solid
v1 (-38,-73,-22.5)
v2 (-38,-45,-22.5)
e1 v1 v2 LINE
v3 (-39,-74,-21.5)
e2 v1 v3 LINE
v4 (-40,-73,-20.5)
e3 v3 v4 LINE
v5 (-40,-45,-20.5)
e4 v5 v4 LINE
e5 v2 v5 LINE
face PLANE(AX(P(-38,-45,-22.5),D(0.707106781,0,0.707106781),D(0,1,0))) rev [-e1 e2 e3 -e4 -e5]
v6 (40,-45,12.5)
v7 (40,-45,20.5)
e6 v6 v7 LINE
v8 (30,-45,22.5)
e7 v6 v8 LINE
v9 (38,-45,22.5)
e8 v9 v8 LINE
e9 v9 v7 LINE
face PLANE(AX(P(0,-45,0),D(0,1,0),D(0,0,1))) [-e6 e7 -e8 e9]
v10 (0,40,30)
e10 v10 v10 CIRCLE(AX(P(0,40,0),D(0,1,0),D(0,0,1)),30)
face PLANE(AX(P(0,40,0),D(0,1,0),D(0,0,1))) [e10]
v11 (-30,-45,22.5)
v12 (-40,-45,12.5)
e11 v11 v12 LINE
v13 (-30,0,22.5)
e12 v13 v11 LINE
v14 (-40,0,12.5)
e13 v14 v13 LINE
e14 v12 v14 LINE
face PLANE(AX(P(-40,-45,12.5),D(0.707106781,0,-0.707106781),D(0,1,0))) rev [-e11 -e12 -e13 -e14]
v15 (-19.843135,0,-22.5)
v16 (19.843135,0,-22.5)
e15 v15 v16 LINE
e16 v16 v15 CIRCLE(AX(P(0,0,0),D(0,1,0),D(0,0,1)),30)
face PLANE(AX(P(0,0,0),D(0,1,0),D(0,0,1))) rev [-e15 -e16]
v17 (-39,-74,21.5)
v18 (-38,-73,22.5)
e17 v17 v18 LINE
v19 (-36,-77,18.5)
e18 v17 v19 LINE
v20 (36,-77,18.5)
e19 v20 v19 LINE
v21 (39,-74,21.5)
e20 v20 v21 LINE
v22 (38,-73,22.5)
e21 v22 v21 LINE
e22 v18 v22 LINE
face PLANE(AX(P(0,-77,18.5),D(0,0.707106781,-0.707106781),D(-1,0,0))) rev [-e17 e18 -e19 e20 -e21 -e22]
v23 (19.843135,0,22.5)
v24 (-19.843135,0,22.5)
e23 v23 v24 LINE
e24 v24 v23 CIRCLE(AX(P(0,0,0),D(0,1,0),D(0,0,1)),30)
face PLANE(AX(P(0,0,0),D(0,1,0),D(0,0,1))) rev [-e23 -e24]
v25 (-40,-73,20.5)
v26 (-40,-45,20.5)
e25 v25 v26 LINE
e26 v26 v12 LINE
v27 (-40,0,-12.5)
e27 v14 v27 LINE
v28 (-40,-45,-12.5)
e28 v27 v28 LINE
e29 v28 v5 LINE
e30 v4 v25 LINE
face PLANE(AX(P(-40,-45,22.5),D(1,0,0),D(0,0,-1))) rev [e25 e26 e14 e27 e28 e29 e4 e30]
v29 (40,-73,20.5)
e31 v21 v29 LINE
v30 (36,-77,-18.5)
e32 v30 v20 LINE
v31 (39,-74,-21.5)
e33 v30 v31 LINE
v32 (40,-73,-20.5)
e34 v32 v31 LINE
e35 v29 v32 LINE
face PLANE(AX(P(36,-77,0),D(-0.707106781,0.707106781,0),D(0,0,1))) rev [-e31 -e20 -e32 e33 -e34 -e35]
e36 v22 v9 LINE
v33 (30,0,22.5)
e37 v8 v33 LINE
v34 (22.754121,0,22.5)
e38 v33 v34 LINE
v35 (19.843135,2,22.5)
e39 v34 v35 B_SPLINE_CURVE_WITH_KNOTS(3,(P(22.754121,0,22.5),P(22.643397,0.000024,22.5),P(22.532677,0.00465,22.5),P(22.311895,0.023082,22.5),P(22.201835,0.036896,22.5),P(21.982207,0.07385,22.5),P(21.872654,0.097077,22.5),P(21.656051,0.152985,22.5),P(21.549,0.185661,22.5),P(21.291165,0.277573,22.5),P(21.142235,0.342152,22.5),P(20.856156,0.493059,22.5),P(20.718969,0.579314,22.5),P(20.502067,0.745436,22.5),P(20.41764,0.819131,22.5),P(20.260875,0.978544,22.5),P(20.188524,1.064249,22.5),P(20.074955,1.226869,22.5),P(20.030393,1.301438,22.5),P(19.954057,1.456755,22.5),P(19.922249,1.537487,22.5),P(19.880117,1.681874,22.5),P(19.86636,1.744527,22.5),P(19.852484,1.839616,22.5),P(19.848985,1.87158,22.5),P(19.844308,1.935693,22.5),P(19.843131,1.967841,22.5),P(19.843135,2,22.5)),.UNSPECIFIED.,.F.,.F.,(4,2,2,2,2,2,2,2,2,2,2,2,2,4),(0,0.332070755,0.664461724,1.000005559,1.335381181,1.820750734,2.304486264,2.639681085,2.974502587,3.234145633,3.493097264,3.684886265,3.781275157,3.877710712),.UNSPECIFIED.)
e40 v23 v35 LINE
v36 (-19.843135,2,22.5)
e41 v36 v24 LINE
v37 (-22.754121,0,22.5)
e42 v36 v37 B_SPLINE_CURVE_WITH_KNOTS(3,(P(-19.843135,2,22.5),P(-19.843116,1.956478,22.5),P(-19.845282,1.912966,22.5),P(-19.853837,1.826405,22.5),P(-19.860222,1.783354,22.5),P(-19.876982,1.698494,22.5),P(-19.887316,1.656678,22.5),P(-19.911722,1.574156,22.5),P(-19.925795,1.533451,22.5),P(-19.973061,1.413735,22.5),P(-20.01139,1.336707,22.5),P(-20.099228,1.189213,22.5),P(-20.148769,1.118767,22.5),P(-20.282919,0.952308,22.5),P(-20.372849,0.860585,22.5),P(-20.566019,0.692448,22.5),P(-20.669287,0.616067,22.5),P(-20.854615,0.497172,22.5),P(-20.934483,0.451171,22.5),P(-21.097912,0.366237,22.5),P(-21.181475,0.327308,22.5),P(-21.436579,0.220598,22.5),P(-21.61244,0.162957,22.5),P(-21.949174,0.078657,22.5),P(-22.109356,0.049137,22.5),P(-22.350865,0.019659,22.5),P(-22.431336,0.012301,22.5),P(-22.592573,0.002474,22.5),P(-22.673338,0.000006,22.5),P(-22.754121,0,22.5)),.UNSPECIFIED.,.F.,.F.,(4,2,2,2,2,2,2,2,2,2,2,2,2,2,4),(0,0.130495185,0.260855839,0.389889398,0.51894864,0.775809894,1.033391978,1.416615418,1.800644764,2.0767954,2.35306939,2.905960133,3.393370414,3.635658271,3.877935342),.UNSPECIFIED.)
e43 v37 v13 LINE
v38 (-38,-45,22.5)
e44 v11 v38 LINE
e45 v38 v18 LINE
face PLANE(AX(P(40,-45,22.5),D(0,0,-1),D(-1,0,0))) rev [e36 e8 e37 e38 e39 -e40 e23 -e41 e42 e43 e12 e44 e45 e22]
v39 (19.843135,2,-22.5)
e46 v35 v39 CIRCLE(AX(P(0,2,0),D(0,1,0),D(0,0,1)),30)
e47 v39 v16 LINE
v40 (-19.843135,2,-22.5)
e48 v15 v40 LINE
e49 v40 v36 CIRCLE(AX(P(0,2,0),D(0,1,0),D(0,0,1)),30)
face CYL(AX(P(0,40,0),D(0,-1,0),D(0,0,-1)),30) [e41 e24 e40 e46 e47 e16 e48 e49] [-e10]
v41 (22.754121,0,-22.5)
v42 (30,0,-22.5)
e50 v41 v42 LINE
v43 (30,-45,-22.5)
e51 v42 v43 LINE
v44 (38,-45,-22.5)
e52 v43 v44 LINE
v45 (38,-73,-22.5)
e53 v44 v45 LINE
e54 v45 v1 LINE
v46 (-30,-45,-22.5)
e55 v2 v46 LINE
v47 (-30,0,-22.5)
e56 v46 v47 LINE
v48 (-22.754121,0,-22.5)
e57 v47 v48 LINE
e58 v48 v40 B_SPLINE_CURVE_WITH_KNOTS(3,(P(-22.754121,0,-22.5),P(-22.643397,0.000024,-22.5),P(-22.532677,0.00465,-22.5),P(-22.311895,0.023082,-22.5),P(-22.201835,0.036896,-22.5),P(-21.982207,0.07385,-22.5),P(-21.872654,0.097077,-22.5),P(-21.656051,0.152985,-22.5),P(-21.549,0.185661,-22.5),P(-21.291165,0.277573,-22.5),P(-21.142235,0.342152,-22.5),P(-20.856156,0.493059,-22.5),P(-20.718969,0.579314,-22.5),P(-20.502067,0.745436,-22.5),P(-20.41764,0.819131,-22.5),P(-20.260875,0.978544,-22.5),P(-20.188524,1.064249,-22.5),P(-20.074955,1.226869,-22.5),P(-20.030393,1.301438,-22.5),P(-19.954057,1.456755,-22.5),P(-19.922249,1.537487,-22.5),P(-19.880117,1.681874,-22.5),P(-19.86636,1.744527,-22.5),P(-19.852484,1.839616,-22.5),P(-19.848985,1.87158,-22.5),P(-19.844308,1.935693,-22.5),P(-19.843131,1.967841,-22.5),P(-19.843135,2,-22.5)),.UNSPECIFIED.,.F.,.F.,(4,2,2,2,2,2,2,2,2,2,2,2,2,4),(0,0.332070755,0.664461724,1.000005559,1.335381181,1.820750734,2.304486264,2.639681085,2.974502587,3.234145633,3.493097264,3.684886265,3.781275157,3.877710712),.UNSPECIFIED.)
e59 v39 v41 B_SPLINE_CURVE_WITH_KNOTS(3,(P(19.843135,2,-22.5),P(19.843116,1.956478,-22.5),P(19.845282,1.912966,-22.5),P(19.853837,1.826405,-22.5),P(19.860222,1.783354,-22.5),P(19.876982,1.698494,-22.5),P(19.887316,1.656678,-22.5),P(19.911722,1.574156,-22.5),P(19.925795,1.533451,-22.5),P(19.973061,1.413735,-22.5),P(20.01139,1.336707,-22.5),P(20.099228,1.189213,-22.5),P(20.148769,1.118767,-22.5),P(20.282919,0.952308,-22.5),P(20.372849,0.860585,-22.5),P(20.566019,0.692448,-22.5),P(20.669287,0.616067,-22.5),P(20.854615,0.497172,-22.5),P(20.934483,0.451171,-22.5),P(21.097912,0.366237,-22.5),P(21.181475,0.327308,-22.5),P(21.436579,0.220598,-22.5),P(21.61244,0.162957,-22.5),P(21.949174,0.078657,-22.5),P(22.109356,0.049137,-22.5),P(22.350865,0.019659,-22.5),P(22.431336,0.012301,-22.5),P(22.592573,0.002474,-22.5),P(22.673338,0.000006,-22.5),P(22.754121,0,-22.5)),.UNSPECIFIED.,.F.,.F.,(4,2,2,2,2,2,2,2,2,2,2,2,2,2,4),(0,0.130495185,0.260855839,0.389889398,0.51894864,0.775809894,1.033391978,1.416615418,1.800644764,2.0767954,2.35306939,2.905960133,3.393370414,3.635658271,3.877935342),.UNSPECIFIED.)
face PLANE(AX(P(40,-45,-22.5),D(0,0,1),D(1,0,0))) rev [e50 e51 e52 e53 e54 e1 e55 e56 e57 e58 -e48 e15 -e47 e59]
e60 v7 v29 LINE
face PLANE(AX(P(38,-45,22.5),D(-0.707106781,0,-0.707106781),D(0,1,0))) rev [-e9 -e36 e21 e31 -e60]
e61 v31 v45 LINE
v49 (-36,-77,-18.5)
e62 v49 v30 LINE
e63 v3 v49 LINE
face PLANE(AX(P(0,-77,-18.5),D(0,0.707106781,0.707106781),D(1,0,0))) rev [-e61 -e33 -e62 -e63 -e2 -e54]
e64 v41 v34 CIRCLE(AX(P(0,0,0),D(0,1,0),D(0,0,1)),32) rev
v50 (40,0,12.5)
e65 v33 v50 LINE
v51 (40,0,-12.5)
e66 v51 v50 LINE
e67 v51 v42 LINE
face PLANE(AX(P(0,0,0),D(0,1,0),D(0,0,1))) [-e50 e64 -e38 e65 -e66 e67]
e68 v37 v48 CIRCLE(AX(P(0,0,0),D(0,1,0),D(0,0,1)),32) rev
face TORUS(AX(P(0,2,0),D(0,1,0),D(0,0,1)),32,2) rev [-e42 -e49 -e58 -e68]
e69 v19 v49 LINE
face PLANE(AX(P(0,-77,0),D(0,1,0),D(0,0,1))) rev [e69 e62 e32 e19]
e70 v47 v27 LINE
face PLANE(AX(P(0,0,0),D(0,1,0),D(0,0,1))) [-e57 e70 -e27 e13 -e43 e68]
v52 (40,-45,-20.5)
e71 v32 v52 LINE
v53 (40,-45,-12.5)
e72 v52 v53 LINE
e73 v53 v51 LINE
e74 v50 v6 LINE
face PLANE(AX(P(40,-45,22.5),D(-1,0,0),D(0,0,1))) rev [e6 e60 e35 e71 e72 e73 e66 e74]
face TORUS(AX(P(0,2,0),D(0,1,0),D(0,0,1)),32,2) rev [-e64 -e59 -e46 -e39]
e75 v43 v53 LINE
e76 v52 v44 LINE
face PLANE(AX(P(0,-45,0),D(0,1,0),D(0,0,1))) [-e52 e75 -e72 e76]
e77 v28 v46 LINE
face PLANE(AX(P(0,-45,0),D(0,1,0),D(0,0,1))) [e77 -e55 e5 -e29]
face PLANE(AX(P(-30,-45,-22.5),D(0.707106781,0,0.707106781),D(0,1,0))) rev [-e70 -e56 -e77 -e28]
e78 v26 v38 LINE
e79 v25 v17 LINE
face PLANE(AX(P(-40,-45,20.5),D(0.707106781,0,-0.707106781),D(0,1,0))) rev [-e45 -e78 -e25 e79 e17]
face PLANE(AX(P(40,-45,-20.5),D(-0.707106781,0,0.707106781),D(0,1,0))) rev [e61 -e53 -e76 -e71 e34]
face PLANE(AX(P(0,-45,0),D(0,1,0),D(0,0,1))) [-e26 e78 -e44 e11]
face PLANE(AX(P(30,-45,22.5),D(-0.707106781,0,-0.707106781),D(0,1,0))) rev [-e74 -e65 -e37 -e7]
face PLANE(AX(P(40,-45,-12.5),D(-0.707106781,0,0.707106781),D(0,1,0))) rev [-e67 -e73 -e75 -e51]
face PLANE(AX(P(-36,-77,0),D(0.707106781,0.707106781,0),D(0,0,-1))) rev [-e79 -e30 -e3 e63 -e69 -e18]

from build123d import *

# Parameters (mm, degrees)
SKETCH1_R           = 30
BOSS_EXTRUDE1_DEPTH = 40
SKETCH2_W           = 80
SKETCH2_H           = 45
BOSS_EXTRUDE2_DEPTH = 45
CHAMFER1_SIZE       = 10
SKETCH4_W           = 80
SKETCH4_H           = 45
BOSS_EXTRUDE3_DEPTH = 2
SKETCH5_W           = 80
SKETCH5_H           = 45
BOSS_EXTRUDE4_DEPTH = 30
CHAMFER2_SIZE       = 2
CHAMFER3_SIZE       = 4
FILLET1_R           = 2


with BuildPart() as part:
    # Sketch1 → Boss-Extrude1 (new body)
    with BuildSketch(Plane(origin=(0, 0, 0), x_dir=(1, 0, 0), z_dir=(0, 1, 0))):
        with Locations(Location((0, 0, 0), (0, 0, 270))):
            Circle(SKETCH1_R)
    extrude(amount=BOSS_EXTRUDE1_DEPTH)

    # Sketch2 → Boss-Extrude2 (add)
    with BuildSketch(Plane.XZ):
        Rectangle(SKETCH2_W, SKETCH2_H)
    extrude(amount=BOSS_EXTRUDE2_DEPTH)

    # Chamfer1
    chamfer1_edges = [part.edges().sort_by_distance(p)[0] for p in [
        (40, -22.5, 22.5),
        (-40, -22.5, 22.5),
        (-40, -22.5, -22.5),
        (40, -22.5, -22.5),
    ]]
    chamfer(chamfer1_edges, length=CHAMFER1_SIZE)

    # Sketch4 → Boss-Extrude3 (add)
    with BuildSketch(Plane(origin=(0, -45, 0), x_dir=(-1, 0, 0), z_dir=(0, -1, 0))):
        Rectangle(SKETCH4_W, SKETCH4_H)
    extrude(amount=BOSS_EXTRUDE3_DEPTH)

    # Sketch5 → Boss-Extrude4 (add)
    with BuildSketch(Plane.XZ.offset(47)):
        Rectangle(SKETCH5_W, SKETCH5_H)
    extrude(amount=BOSS_EXTRUDE4_DEPTH)

    # Chamfer2
    chamfer2_edges = [part.edges().sort_by_distance(p)[0] for p in [
        (40, -61, -22.5),
        (40, -61, 22.5),
        (-40, -61, 22.5),
        (-40, -61, -22.5),
    ]]
    chamfer(chamfer2_edges, length=CHAMFER2_SIZE)

    # Chamfer3
    # the kernel refuses this chamfer: 4 mm, written as the material it takes off along each edge
    with BuildSketch(Plane(origin=(48.286731952, -77, 22.5), x_dir=(0, 0.9996219169112968, 0.02749587661058651), z_dir=(-1, 0, 0))) as chamfer3_piece_1:
        Polygon((CHAMFER3_SIZE * 0.999621916911, CHAMFER3_SIZE * 0.0274958766106), (-CHAMFER3_SIZE * 0.0274958766106, CHAMFER3_SIZE * 0.999621916911), (0, 0), align=None)
    extrude(amount=96.573463904, mode=Mode.SUBTRACT)
    with BuildSketch(Plane(origin=(-40, -77, 30.786731952), x_dir=(0.9996219169112968, -0.027495876610585647, 0), z_dir=(0, 0, -1)), Plane(origin=(40, -77, -30.786731952), x_dir=(-0.9996219169112968, -0.027495876610585647, 0), z_dir=(0, 0, 1))) as chamfer3_piece_2:
        Polygon((CHAMFER3_SIZE * 0.999621916911, -CHAMFER3_SIZE * 0.0274958766106), (-CHAMFER3_SIZE * 0.0274958766106, -CHAMFER3_SIZE * 0.999621916911), (0, 0), align=None)
    extrude(amount=61.573463904, mode=Mode.SUBTRACT)
    with BuildSketch(Plane(origin=(-48.286731952, -77, -22.5), x_dir=(0, -0.027495876610585623, 0.9996219169112968), z_dir=(1, 0, 0))) as chamfer3_piece_3:
        Polygon((CHAMFER3_SIZE * 0.999621916911, -CHAMFER3_SIZE * 0.0274958766106), (-CHAMFER3_SIZE * 0.0274958766106, -CHAMFER3_SIZE * 0.999621916911), (0, 0), align=None)
    extrude(amount=96.573463904, mode=Mode.SUBTRACT)

    # Fillet1
    # the kernel refuses this fillet: 2 mm, written as the material it adds along each edge
    with BuildSketch(Plane(origin=(0, 0, 0), x_dir=(0.527784032478236, 0, 0.8493786052526943), z_dir=(-0.8493786052526943, 0, 0.527784032478236))) as fillet1_piece_1_section:
        with BuildLine():
            CenterArc((30 + FILLET1_R, FILLET1_R), FILLET1_R, 180, 90)
            Line((30, FILLET1_R), (30, 0))
            Line((30, 0), (30 + FILLET1_R, 0))
        make_face()
    fillet1_piece_1 = revolve(axis=Axis((0, 0, 0), (0, 1, 0)), revolution_arc=116.288294518, mode=Mode.PRIVATE)
    fillet1_piece_1 = split(fillet1_piece_1, bisect_by=Plane(origin=(30.560923214, 0.560923214, 22.5), z_dir=(0, 0, -1)), keep=Keep.TOP, mode=Mode.PRIVATE)
    fillet1_piece_1 = split(fillet1_piece_1, bisect_by=Plane(origin=(30.560923214, 0.560923214, -22.5), z_dir=(0, 0, 1)), keep=Keep.TOP, mode=Mode.PRIVATE)
    add(fillet1_piece_1)
    with BuildSketch(Plane(origin=(0, 0, 0), x_dir=(-0.527784032478229, 0, -0.8493786052526988), z_dir=(0.8493786052526988, 0, -0.527784032478229))) as fillet1_piece_2_section:
        with BuildLine():
            CenterArc((30 + FILLET1_R, FILLET1_R), FILLET1_R, 180, 90)
            Line((30, FILLET1_R), (30, 0))
            Line((30, 0), (30 + FILLET1_R, 0))
        make_face()
    fillet1_piece_2 = revolve(axis=Axis((0, 0, 0), (0, 1, 0)), revolution_arc=116.288294518, mode=Mode.PRIVATE)
    fillet1_piece_2 = split(fillet1_piece_2, bisect_by=Plane(origin=(-30.560923214, 0.560923214, 22.5), z_dir=(0, 0, -1)), keep=Keep.TOP, mode=Mode.PRIVATE)
    fillet1_piece_2 = split(fillet1_piece_2, bisect_by=Plane(origin=(-30.560923214, 0.560923214, -22.5), z_dir=(0, 0, 1)), keep=Keep.TOP, mode=Mode.PRIVATE)
    add(fillet1_piece_2)


solid = part.part
